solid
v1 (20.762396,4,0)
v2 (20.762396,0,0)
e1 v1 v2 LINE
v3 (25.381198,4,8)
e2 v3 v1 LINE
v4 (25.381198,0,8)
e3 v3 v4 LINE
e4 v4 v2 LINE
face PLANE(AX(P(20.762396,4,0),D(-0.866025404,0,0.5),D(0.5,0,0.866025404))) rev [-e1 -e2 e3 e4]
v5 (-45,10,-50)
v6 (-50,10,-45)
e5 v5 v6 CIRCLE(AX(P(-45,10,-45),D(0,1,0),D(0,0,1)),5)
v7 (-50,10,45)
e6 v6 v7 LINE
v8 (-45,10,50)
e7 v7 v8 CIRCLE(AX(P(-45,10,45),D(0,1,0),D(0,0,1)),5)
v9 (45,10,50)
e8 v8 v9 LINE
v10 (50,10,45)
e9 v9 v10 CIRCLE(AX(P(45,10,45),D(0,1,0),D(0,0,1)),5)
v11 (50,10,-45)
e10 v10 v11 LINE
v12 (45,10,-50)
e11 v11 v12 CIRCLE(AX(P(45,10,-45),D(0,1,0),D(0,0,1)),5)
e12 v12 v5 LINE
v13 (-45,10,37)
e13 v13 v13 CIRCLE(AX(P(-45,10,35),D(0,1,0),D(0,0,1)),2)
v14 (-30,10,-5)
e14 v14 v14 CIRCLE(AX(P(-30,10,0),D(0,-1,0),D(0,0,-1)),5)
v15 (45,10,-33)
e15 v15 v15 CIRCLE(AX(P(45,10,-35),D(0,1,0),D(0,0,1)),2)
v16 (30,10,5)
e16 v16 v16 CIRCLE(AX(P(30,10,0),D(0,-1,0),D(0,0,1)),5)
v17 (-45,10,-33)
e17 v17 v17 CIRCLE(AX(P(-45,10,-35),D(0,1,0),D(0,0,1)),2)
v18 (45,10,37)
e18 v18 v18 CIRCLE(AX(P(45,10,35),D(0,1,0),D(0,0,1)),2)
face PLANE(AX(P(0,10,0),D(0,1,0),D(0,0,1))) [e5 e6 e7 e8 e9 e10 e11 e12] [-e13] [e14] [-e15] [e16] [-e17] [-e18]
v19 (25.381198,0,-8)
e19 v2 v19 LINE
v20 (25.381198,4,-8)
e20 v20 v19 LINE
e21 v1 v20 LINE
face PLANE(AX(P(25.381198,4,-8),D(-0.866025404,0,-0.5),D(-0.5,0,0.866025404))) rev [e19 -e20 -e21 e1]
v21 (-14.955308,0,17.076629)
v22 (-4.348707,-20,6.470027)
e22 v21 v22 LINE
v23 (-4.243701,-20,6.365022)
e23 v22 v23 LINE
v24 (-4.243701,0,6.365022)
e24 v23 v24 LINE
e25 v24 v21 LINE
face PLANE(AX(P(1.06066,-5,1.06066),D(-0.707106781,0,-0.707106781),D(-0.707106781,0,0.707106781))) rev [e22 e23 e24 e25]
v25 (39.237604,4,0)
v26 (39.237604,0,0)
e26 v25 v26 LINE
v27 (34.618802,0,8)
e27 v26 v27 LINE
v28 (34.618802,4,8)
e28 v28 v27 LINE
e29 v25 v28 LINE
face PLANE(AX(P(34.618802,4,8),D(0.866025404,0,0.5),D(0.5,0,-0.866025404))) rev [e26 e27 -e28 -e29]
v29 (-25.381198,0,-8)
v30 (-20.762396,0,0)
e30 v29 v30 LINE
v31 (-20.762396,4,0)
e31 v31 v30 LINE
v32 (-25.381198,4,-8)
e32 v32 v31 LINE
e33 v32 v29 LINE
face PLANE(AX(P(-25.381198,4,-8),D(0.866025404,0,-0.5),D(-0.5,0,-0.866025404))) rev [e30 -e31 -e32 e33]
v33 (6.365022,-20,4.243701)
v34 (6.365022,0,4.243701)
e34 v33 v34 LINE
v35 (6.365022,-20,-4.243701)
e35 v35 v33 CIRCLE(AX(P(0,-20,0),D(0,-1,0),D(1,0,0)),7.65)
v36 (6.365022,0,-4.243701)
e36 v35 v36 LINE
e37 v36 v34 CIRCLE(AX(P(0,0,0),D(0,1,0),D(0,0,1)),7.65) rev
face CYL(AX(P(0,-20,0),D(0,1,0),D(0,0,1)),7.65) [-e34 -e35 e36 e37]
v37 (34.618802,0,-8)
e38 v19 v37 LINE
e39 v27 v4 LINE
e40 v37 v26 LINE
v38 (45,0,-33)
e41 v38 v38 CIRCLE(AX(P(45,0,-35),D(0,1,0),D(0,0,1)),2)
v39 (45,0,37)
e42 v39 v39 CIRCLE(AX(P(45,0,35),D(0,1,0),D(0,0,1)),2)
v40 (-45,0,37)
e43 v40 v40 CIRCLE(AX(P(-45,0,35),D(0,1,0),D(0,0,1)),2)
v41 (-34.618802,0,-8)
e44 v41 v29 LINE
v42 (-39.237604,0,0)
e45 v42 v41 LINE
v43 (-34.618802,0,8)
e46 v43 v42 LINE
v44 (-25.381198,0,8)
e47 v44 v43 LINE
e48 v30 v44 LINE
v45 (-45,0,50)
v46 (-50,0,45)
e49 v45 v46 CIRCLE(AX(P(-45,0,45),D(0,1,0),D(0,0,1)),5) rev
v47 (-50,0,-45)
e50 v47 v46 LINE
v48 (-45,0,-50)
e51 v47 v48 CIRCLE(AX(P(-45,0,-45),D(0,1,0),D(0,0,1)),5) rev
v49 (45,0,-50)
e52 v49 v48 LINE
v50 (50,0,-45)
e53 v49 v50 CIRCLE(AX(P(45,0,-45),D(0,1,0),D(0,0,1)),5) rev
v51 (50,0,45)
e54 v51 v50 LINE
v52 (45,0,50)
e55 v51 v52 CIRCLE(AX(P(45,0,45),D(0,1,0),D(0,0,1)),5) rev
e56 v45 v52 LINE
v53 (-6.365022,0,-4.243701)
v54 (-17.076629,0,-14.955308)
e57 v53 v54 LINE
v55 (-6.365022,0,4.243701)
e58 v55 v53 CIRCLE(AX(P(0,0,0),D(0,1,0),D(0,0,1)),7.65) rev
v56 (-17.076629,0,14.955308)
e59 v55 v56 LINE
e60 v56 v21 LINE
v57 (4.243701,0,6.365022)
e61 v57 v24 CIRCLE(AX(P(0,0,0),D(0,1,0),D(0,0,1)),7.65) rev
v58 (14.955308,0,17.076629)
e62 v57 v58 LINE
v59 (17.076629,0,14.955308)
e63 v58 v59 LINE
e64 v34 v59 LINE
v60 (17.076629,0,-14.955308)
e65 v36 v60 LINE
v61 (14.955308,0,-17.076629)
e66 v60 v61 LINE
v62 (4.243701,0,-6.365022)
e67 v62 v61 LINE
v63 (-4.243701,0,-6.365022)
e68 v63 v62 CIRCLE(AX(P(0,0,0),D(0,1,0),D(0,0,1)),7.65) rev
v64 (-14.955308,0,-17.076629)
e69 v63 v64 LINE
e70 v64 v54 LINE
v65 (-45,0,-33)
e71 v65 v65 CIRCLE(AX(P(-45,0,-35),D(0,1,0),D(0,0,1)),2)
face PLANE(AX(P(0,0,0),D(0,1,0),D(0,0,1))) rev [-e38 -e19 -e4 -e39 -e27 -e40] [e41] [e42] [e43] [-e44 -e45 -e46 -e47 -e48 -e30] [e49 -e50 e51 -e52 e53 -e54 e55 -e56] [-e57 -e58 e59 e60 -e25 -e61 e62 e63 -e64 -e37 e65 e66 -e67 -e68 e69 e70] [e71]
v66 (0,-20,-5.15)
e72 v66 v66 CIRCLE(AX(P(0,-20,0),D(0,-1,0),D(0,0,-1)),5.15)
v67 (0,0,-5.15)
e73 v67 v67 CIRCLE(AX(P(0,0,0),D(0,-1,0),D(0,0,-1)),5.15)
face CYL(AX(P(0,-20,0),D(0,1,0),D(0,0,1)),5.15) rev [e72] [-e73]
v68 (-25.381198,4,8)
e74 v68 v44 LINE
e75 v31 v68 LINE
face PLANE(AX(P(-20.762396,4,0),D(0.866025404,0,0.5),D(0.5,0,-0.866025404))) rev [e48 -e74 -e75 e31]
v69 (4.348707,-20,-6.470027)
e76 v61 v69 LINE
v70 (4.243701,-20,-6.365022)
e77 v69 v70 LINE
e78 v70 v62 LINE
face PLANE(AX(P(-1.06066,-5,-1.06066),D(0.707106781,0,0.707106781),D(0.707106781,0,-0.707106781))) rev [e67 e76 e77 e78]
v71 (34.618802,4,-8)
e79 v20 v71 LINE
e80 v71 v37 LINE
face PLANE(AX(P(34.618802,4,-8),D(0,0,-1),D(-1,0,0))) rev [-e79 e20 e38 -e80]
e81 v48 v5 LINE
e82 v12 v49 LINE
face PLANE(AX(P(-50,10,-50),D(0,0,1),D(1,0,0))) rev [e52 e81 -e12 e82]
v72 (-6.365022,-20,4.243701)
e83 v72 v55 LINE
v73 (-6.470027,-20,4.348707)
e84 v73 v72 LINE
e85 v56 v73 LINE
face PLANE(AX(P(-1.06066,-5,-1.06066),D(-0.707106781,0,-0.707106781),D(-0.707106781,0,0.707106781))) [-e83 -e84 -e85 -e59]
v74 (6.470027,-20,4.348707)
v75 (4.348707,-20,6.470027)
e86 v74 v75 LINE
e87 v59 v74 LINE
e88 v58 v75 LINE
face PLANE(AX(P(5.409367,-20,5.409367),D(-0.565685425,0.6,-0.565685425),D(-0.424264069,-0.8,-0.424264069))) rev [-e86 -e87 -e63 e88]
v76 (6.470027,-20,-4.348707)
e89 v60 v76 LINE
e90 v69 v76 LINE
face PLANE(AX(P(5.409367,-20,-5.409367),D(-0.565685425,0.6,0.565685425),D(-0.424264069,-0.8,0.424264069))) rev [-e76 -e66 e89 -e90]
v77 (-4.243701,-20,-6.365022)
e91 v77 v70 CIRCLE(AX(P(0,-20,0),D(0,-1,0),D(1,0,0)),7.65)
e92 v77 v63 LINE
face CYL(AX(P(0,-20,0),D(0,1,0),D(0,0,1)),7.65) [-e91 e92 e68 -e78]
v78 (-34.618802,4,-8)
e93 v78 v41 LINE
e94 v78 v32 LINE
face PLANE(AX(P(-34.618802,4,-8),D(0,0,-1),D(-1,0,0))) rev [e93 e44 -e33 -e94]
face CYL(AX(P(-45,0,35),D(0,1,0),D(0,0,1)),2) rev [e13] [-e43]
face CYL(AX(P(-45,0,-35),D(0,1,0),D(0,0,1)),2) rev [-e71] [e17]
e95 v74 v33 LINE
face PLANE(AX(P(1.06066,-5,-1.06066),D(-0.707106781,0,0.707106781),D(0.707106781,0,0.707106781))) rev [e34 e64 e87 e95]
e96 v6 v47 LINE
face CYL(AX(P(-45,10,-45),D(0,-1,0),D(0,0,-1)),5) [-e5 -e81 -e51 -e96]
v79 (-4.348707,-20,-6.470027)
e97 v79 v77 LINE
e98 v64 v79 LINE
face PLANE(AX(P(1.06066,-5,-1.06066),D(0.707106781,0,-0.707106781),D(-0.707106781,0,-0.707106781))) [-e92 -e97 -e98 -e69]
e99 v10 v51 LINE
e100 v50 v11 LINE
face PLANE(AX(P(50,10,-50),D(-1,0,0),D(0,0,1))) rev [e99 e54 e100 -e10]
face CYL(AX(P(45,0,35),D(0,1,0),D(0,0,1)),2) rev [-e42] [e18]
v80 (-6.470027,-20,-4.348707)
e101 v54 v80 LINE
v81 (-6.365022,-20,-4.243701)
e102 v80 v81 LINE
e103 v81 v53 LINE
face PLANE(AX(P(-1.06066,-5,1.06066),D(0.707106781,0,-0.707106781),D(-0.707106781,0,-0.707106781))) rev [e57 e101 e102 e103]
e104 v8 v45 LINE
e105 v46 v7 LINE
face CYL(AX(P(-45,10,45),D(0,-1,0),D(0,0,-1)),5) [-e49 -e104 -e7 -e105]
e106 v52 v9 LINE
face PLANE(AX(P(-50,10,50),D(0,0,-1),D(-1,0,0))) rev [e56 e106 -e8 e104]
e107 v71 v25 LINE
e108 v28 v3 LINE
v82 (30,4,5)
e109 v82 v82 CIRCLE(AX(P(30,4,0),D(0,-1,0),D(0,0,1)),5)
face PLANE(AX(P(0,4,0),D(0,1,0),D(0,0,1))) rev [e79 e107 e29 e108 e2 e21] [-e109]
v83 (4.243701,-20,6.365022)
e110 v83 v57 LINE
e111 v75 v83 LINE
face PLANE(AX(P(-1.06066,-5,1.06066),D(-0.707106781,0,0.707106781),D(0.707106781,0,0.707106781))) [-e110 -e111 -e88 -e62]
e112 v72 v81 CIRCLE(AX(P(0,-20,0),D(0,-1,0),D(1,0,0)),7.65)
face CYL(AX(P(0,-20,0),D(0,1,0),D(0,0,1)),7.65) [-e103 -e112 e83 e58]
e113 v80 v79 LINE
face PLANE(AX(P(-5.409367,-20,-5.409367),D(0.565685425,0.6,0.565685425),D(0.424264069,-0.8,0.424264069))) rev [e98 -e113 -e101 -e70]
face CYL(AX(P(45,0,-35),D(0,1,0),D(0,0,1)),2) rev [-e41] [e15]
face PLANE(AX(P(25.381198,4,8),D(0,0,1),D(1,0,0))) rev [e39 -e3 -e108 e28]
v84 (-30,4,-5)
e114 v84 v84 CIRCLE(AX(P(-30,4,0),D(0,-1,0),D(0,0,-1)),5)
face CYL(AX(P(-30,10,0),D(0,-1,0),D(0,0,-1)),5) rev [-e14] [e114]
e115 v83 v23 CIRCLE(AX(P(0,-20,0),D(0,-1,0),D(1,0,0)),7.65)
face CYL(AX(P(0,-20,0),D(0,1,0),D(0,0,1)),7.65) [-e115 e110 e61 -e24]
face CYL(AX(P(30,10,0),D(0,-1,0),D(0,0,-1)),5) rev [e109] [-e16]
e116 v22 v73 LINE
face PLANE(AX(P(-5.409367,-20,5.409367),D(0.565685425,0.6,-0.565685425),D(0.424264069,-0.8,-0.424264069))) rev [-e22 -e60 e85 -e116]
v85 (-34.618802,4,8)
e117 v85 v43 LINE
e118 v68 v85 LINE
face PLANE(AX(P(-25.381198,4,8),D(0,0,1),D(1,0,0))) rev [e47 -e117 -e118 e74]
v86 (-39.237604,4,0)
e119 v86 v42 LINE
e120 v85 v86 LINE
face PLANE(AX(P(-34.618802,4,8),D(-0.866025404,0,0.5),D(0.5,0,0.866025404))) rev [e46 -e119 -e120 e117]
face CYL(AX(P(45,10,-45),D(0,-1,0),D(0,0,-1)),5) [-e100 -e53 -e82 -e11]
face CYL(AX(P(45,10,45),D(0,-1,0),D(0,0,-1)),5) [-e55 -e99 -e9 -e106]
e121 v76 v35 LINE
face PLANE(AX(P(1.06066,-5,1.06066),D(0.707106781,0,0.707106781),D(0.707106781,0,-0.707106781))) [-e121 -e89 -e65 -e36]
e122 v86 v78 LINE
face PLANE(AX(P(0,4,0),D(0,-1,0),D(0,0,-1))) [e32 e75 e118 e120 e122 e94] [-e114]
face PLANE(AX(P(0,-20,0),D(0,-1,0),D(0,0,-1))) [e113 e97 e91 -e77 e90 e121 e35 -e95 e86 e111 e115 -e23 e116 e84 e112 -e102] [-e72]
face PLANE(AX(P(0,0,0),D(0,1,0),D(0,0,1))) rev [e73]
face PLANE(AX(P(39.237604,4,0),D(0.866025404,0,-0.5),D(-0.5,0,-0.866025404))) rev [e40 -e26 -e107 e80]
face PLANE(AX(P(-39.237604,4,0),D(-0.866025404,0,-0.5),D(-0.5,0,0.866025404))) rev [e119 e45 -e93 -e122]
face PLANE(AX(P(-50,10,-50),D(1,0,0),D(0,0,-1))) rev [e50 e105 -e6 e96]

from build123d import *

# Parameters (mm, degrees)
SKETCH1_W           = 100
SKETCH1_H           = 100
BOSS_EXTRUDE1_DEPTH = 10
SKETCH2_R           = 2
CUT_EXTRUDE1_DEPTH  = 72.414284285
CUT_EXTRUDE2_DEPTH  = 4
SKETCH4_R           = 5
CUT_EXTRUDE3_DEPTH  = 71.964779997
SKETCH5_R           = 7.65
SKETCH5_R_2         = 5.15
EXTRUDE_THIN1_DEPTH = 20
RIB6_START          = -1.5
RIB6_DEPTH          = 3
CIRPATTERN2_COUNT   = 4
FILLET1_R           = 5


with BuildPart() as part:
    # Sketch1 → Boss-Extrude1 (new body)
    with BuildSketch(Plane(origin=(0, 0, 0), x_dir=(1, 0, 0), z_dir=(0, 1, 0))):
        Rectangle(SKETCH1_W, SKETCH1_H)
    extrude(amount=BOSS_EXTRUDE1_DEPTH)

    # Sketch2 → Cut-Extrude1 (cut, through all)
    with BuildSketch(Plane(origin=(0, 10, 0), x_dir=(1, 0, 0), z_dir=(0, 1, 0))):
        with Locations(Location((-45, 35, 0), (0, 0, 270))):
            Circle(SKETCH2_R)
        with Locations(Location((45, 35, 0), (0, 0, 270))):
            Circle(SKETCH2_R)
        with Locations(Location((45, -35, 0), (0, 0, 270))):
            Circle(SKETCH2_R)
        with Locations(Location((-45, -35, 0), (0, 0, 270))):
            Circle(SKETCH2_R)
    extrude(amount=-CUT_EXTRUDE1_DEPTH, mode=Mode.SUBTRACT)

    # Sketch3 → Cut-Extrude2 (cut)
    with BuildSketch(Plane.XZ):
        Polygon((-20.762395693, 0), (-25.381197846, 8), (-34.618802154, 8), (-39.237604307, 0), (-34.618802154, -8), (-25.381197846, -8), align=None)
        Polygon((25.381197846, -8), (20.762395693, 0), (25.381197846, 8), (34.618802154, 8), (39.237604307, 0), (34.618802154, -8), align=None)
    extrude(amount=-CUT_EXTRUDE2_DEPTH, mode=Mode.SUBTRACT)

    # Sketch4 → Cut-Extrude3 (cut, through all)
    with BuildSketch(Plane.XZ.offset(-4)):
        with Locations(Location((-30, 0, 0), (0, 0, 270))):
            Circle(SKETCH4_R)
        with Locations(Location((30, 0, 0), (0, 0, 90))):
            Circle(SKETCH4_R)
    extrude(amount=-CUT_EXTRUDE3_DEPTH, mode=Mode.SUBTRACT)

    # Sketch5 → Extrude-Thin1 (add)
    with BuildSketch(Plane.XZ):
        Circle(SKETCH5_R)
        Circle(SKETCH5_R_2, mode=Mode.SUBTRACT)
    extrude(amount=EXTRUDE_THIN1_DEPTH)

    # Rib6: read off the stored shape, not the designer's step
    # Rib6 outline → Rib6 (add)
    with BuildSketch(Plane(origin=(0, 0, 0), x_dir=(0.7071067811865461, 0, -0.7071067811865489), z_dir=(0.7071067811865489, 0, 0.7071067811865461)).offset(RIB6_START)):
        Polygon((7.65, -20), (22.65, 0), (7.50149985, 0), (7.50149985, -20), align=None)
    rib6 = extrude(amount=RIB6_DEPTH)

    # CirPattern2: Rib6 ×4 about axis
    cirpattern2_axis = Axis((0, 0, 0), (0, 1, 0))
    for i in range(1, CIRPATTERN2_COUNT):
        add(rib6.rotate(cirpattern2_axis, i * 360 / CIRPATTERN2_COUNT))

    # Fillet1
    fillet1_edges = [part.edges().sort_by_distance(p)[0] for p in [
        (50, 5, 50),
        (-50, 5, 50),
        (-50, 5, -50),
        (50, 5, -50),
    ]]
    fillet(fillet1_edges, radius=FILLET1_R)


solid = part.part
